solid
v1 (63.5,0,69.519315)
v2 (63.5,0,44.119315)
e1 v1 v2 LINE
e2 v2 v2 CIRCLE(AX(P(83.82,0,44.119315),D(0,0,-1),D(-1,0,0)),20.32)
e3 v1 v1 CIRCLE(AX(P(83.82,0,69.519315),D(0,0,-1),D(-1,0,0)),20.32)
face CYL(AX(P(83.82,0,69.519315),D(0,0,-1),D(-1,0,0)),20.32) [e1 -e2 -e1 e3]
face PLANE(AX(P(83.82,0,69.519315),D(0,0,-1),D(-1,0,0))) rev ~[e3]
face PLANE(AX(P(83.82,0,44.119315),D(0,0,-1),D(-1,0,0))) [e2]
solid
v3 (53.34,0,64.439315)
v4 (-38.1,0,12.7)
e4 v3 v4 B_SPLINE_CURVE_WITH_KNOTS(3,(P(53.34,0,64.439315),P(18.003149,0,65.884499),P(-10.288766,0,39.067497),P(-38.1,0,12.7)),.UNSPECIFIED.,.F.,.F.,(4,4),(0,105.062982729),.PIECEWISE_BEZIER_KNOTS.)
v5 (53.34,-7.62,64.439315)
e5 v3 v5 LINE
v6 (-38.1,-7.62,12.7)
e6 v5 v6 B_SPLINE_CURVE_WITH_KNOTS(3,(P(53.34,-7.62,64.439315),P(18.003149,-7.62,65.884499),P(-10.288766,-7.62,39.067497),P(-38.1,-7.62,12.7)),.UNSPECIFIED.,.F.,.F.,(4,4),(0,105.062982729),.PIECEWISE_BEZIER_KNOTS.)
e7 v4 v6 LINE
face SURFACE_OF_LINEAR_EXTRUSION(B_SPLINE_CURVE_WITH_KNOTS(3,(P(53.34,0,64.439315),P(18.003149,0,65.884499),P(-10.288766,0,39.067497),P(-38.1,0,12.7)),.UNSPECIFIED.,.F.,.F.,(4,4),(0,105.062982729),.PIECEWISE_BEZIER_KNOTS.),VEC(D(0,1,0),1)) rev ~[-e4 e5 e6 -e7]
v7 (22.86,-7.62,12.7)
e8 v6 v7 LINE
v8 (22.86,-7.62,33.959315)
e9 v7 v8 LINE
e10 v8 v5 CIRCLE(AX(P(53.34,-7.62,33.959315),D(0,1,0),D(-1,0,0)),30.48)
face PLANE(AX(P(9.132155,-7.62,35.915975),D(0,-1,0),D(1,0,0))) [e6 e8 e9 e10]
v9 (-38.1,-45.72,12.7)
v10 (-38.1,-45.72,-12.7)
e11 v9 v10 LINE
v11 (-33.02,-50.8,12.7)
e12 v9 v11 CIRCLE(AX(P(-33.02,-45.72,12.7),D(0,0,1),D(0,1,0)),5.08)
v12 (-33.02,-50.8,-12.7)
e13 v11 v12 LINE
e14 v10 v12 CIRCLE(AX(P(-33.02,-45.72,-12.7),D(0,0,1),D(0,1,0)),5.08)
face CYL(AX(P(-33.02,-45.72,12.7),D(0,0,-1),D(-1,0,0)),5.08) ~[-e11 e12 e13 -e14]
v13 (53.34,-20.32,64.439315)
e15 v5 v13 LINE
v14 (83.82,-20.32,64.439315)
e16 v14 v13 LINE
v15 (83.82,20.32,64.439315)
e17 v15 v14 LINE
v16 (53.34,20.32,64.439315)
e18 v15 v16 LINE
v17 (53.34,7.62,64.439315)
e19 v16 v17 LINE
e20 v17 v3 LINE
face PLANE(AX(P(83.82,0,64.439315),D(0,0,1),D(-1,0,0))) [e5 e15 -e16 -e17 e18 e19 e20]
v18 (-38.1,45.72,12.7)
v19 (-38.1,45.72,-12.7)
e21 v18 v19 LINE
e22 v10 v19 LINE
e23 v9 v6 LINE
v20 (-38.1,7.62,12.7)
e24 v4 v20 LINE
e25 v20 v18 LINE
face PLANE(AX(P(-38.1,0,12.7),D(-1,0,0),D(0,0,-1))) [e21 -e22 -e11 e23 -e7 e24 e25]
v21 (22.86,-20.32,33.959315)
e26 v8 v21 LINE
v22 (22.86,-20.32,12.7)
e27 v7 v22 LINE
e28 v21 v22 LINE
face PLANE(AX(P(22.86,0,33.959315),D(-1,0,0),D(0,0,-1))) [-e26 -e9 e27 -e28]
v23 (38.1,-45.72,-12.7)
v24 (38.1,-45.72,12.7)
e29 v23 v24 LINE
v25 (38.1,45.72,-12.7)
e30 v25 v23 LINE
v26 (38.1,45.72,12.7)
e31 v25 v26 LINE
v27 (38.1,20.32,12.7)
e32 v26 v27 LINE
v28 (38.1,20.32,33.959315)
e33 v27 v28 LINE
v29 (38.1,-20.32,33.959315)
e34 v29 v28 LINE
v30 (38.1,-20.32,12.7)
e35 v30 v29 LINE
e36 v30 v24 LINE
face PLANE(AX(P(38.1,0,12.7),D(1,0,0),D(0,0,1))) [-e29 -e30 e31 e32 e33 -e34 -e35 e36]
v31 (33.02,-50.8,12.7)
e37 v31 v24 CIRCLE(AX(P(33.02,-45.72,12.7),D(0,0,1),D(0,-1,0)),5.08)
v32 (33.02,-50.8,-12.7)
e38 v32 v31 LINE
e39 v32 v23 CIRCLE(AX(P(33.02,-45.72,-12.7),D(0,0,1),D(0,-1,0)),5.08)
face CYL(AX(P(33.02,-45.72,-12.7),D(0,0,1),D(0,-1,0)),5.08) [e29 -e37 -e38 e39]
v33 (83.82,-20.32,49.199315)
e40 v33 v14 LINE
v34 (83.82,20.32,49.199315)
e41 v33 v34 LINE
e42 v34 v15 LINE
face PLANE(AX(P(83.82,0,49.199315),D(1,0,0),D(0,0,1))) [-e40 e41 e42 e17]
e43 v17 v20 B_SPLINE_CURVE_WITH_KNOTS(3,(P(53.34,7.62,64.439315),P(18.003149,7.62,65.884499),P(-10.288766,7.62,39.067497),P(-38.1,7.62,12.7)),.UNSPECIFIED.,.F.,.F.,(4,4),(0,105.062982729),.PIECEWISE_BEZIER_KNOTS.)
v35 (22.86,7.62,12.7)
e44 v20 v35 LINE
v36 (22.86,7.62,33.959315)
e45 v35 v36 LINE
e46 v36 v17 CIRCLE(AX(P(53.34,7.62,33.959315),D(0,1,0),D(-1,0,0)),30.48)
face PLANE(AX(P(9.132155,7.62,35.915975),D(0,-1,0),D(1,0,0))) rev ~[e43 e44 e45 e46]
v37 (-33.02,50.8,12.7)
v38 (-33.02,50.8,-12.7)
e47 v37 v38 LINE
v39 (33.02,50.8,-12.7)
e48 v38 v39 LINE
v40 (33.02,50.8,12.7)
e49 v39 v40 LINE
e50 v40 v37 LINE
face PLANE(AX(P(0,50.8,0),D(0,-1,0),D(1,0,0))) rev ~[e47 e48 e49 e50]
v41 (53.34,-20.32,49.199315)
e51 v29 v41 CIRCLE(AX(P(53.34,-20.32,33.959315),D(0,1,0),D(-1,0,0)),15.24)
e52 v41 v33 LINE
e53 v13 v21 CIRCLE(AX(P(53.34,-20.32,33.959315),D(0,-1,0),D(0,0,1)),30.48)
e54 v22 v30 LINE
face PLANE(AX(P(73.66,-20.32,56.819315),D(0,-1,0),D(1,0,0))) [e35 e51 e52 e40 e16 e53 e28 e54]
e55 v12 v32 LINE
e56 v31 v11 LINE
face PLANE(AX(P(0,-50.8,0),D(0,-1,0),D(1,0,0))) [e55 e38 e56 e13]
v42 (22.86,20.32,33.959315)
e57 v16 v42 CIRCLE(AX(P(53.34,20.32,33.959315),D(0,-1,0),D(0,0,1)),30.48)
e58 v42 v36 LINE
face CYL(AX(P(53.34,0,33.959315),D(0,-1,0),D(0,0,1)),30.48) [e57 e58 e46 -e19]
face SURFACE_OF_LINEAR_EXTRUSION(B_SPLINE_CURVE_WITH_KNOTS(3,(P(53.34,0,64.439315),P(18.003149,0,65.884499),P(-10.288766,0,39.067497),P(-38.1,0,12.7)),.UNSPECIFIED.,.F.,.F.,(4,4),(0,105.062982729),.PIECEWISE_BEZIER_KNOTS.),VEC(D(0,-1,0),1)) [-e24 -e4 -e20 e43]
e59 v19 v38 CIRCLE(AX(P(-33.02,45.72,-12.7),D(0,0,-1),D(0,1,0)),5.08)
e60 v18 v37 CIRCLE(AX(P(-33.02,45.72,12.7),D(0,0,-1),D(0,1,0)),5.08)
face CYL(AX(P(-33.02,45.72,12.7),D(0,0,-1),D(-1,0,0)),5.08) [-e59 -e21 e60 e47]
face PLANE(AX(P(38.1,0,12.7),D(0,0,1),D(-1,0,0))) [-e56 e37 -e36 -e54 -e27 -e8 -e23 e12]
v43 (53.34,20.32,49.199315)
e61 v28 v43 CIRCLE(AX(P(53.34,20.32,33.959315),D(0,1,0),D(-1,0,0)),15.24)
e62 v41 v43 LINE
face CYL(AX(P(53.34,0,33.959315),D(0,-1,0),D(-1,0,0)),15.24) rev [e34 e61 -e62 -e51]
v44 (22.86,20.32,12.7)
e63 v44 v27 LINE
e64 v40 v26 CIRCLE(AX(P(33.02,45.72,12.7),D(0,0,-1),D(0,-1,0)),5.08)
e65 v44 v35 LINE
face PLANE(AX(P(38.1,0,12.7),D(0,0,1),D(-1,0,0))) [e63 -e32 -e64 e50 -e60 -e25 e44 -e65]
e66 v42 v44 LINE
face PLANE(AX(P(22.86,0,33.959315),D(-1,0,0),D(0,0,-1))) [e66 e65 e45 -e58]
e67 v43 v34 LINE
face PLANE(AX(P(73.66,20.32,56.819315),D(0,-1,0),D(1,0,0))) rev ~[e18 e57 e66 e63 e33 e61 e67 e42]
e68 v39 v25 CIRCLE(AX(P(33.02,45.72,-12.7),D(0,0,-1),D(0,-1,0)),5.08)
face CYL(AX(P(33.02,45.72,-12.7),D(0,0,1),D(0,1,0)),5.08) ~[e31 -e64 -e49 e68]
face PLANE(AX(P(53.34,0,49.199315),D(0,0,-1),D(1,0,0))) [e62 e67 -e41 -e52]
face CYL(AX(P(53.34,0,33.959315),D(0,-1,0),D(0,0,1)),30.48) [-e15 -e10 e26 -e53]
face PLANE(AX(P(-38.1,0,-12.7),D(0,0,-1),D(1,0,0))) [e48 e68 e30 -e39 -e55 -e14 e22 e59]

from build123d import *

# Parameters (mm, degrees)
F0_W          = 20.32
F0_H          = 15.24000009
F0_H_2        = 5.07999991
F0_H_3        = 5.08
F2_DEPTH      = 50.8
F2_DEPTH_BACK = 50.8
F3_DEPTH      = 20.32
F3_DEPTH_BACK = 20.32
F4_DEPTH      = 7.62
F4_DEPTH_BACK = 7.62
F5_R          = 5.08


with BuildPart() as f1:
    # F0 (on Front) → F1 (revolve)
    with BuildSketch(Plane.XZ):
        with Locations((73.66, 56.8193151802)):
            Rectangle(F0_W, F0_H)
        with Locations((73.66, 66.9793151802)):
            Rectangle(F0_W, F0_H_2)
        with Locations((73.66, 46.6593151352)):
            Rectangle(F0_W, F0_H_3)
    revolve(axis=Axis((83.82, 0, 63.1609670818), (0, 0, -1)))


with BuildPart() as f2:
    # F0 (on Front) → F2 (new body, two sides)
    with BuildSketch(Plane.XZ) as f2_sk:
        Polygon((-38.1, -12.7), (38.1, -12.7), (38.1, 12.7), (22.85999991, 12.7), (-38.1, 12.7), align=None)
    extrude(amount=F2_DEPTH)
    extrude(f2_sk.sketch, amount=-F2_DEPTH_BACK)

    # F0 (on Front) → F3 (join, two sides)
    with BuildSketch(Plane.XZ) as f3_sk:
        with Locations((73.66, 56.8193151802)):
            Rectangle(F0_W, F0_H)
        with BuildLine():
            Line((22.85999991, 12.7), (38.1, 12.7))
            Line((38.1, 12.7), (38.1, 33.9593151352))
            ThreePointArc((38.1, 33.9593151352), (42.5636926547, 44.7356224805), (53.34, 49.1993151352))
            Line((53.34, 49.1993151352), (63.5, 49.1993151352))
            Line((63.5, 49.1993151352), (63.5, 64.4393152252))
            Line((63.5, 64.4393152252), (53.34, 64.4393152252))
            ThreePointArc((53.34, 64.4393152252), (31.7873852458, 55.5119298894), (22.85999991, 33.9593151352))
            Line((22.85999991, 33.9593151352), (22.85999991, 12.7))
        make_face()
    extrude(amount=F3_DEPTH)
    extrude(f3_sk.sketch, amount=-F3_DEPTH_BACK)

    # F0 (on Front) → F4 (join, two sides)
    with BuildSketch(Plane.XZ) as f4_sk:
        with BuildLine():
            add(Edge.make_bspline(
                [(53.34, 64.4393152252), (18.0031490481, 65.8844992586), (-10.2887663049, 39.0674972777), (-38.1, 12.7)],
                knots=[0, 0, 0, 0, 105.0629827293, 105.0629827293, 105.0629827293, 105.0629827293], degree=3))
            Line((-38.1, 12.7), (22.85999991, 12.7))
            Line((22.85999991, 12.7), (22.85999991, 33.9593151352))
            ThreePointArc((22.85999991, 33.9593151352), (31.7873852458, 55.5119298894), (53.34, 64.4393152252))
        make_face()
    extrude(amount=F4_DEPTH)
    extrude(f4_sk.sketch, amount=-F4_DEPTH_BACK)

    # F5
    f5_edges = [f2.edges().sort_by_distance(p)[0] for p in [
        (-38.1, -50.8, 0),
        (38.1, -50.8, 0),
        (-38.1, 50.8, 0),
        (38.1, 50.8, 0),
    ]]
    fillet(f5_edges, radius=F5_R)


solid = Compound([f1.part, f2.part])
